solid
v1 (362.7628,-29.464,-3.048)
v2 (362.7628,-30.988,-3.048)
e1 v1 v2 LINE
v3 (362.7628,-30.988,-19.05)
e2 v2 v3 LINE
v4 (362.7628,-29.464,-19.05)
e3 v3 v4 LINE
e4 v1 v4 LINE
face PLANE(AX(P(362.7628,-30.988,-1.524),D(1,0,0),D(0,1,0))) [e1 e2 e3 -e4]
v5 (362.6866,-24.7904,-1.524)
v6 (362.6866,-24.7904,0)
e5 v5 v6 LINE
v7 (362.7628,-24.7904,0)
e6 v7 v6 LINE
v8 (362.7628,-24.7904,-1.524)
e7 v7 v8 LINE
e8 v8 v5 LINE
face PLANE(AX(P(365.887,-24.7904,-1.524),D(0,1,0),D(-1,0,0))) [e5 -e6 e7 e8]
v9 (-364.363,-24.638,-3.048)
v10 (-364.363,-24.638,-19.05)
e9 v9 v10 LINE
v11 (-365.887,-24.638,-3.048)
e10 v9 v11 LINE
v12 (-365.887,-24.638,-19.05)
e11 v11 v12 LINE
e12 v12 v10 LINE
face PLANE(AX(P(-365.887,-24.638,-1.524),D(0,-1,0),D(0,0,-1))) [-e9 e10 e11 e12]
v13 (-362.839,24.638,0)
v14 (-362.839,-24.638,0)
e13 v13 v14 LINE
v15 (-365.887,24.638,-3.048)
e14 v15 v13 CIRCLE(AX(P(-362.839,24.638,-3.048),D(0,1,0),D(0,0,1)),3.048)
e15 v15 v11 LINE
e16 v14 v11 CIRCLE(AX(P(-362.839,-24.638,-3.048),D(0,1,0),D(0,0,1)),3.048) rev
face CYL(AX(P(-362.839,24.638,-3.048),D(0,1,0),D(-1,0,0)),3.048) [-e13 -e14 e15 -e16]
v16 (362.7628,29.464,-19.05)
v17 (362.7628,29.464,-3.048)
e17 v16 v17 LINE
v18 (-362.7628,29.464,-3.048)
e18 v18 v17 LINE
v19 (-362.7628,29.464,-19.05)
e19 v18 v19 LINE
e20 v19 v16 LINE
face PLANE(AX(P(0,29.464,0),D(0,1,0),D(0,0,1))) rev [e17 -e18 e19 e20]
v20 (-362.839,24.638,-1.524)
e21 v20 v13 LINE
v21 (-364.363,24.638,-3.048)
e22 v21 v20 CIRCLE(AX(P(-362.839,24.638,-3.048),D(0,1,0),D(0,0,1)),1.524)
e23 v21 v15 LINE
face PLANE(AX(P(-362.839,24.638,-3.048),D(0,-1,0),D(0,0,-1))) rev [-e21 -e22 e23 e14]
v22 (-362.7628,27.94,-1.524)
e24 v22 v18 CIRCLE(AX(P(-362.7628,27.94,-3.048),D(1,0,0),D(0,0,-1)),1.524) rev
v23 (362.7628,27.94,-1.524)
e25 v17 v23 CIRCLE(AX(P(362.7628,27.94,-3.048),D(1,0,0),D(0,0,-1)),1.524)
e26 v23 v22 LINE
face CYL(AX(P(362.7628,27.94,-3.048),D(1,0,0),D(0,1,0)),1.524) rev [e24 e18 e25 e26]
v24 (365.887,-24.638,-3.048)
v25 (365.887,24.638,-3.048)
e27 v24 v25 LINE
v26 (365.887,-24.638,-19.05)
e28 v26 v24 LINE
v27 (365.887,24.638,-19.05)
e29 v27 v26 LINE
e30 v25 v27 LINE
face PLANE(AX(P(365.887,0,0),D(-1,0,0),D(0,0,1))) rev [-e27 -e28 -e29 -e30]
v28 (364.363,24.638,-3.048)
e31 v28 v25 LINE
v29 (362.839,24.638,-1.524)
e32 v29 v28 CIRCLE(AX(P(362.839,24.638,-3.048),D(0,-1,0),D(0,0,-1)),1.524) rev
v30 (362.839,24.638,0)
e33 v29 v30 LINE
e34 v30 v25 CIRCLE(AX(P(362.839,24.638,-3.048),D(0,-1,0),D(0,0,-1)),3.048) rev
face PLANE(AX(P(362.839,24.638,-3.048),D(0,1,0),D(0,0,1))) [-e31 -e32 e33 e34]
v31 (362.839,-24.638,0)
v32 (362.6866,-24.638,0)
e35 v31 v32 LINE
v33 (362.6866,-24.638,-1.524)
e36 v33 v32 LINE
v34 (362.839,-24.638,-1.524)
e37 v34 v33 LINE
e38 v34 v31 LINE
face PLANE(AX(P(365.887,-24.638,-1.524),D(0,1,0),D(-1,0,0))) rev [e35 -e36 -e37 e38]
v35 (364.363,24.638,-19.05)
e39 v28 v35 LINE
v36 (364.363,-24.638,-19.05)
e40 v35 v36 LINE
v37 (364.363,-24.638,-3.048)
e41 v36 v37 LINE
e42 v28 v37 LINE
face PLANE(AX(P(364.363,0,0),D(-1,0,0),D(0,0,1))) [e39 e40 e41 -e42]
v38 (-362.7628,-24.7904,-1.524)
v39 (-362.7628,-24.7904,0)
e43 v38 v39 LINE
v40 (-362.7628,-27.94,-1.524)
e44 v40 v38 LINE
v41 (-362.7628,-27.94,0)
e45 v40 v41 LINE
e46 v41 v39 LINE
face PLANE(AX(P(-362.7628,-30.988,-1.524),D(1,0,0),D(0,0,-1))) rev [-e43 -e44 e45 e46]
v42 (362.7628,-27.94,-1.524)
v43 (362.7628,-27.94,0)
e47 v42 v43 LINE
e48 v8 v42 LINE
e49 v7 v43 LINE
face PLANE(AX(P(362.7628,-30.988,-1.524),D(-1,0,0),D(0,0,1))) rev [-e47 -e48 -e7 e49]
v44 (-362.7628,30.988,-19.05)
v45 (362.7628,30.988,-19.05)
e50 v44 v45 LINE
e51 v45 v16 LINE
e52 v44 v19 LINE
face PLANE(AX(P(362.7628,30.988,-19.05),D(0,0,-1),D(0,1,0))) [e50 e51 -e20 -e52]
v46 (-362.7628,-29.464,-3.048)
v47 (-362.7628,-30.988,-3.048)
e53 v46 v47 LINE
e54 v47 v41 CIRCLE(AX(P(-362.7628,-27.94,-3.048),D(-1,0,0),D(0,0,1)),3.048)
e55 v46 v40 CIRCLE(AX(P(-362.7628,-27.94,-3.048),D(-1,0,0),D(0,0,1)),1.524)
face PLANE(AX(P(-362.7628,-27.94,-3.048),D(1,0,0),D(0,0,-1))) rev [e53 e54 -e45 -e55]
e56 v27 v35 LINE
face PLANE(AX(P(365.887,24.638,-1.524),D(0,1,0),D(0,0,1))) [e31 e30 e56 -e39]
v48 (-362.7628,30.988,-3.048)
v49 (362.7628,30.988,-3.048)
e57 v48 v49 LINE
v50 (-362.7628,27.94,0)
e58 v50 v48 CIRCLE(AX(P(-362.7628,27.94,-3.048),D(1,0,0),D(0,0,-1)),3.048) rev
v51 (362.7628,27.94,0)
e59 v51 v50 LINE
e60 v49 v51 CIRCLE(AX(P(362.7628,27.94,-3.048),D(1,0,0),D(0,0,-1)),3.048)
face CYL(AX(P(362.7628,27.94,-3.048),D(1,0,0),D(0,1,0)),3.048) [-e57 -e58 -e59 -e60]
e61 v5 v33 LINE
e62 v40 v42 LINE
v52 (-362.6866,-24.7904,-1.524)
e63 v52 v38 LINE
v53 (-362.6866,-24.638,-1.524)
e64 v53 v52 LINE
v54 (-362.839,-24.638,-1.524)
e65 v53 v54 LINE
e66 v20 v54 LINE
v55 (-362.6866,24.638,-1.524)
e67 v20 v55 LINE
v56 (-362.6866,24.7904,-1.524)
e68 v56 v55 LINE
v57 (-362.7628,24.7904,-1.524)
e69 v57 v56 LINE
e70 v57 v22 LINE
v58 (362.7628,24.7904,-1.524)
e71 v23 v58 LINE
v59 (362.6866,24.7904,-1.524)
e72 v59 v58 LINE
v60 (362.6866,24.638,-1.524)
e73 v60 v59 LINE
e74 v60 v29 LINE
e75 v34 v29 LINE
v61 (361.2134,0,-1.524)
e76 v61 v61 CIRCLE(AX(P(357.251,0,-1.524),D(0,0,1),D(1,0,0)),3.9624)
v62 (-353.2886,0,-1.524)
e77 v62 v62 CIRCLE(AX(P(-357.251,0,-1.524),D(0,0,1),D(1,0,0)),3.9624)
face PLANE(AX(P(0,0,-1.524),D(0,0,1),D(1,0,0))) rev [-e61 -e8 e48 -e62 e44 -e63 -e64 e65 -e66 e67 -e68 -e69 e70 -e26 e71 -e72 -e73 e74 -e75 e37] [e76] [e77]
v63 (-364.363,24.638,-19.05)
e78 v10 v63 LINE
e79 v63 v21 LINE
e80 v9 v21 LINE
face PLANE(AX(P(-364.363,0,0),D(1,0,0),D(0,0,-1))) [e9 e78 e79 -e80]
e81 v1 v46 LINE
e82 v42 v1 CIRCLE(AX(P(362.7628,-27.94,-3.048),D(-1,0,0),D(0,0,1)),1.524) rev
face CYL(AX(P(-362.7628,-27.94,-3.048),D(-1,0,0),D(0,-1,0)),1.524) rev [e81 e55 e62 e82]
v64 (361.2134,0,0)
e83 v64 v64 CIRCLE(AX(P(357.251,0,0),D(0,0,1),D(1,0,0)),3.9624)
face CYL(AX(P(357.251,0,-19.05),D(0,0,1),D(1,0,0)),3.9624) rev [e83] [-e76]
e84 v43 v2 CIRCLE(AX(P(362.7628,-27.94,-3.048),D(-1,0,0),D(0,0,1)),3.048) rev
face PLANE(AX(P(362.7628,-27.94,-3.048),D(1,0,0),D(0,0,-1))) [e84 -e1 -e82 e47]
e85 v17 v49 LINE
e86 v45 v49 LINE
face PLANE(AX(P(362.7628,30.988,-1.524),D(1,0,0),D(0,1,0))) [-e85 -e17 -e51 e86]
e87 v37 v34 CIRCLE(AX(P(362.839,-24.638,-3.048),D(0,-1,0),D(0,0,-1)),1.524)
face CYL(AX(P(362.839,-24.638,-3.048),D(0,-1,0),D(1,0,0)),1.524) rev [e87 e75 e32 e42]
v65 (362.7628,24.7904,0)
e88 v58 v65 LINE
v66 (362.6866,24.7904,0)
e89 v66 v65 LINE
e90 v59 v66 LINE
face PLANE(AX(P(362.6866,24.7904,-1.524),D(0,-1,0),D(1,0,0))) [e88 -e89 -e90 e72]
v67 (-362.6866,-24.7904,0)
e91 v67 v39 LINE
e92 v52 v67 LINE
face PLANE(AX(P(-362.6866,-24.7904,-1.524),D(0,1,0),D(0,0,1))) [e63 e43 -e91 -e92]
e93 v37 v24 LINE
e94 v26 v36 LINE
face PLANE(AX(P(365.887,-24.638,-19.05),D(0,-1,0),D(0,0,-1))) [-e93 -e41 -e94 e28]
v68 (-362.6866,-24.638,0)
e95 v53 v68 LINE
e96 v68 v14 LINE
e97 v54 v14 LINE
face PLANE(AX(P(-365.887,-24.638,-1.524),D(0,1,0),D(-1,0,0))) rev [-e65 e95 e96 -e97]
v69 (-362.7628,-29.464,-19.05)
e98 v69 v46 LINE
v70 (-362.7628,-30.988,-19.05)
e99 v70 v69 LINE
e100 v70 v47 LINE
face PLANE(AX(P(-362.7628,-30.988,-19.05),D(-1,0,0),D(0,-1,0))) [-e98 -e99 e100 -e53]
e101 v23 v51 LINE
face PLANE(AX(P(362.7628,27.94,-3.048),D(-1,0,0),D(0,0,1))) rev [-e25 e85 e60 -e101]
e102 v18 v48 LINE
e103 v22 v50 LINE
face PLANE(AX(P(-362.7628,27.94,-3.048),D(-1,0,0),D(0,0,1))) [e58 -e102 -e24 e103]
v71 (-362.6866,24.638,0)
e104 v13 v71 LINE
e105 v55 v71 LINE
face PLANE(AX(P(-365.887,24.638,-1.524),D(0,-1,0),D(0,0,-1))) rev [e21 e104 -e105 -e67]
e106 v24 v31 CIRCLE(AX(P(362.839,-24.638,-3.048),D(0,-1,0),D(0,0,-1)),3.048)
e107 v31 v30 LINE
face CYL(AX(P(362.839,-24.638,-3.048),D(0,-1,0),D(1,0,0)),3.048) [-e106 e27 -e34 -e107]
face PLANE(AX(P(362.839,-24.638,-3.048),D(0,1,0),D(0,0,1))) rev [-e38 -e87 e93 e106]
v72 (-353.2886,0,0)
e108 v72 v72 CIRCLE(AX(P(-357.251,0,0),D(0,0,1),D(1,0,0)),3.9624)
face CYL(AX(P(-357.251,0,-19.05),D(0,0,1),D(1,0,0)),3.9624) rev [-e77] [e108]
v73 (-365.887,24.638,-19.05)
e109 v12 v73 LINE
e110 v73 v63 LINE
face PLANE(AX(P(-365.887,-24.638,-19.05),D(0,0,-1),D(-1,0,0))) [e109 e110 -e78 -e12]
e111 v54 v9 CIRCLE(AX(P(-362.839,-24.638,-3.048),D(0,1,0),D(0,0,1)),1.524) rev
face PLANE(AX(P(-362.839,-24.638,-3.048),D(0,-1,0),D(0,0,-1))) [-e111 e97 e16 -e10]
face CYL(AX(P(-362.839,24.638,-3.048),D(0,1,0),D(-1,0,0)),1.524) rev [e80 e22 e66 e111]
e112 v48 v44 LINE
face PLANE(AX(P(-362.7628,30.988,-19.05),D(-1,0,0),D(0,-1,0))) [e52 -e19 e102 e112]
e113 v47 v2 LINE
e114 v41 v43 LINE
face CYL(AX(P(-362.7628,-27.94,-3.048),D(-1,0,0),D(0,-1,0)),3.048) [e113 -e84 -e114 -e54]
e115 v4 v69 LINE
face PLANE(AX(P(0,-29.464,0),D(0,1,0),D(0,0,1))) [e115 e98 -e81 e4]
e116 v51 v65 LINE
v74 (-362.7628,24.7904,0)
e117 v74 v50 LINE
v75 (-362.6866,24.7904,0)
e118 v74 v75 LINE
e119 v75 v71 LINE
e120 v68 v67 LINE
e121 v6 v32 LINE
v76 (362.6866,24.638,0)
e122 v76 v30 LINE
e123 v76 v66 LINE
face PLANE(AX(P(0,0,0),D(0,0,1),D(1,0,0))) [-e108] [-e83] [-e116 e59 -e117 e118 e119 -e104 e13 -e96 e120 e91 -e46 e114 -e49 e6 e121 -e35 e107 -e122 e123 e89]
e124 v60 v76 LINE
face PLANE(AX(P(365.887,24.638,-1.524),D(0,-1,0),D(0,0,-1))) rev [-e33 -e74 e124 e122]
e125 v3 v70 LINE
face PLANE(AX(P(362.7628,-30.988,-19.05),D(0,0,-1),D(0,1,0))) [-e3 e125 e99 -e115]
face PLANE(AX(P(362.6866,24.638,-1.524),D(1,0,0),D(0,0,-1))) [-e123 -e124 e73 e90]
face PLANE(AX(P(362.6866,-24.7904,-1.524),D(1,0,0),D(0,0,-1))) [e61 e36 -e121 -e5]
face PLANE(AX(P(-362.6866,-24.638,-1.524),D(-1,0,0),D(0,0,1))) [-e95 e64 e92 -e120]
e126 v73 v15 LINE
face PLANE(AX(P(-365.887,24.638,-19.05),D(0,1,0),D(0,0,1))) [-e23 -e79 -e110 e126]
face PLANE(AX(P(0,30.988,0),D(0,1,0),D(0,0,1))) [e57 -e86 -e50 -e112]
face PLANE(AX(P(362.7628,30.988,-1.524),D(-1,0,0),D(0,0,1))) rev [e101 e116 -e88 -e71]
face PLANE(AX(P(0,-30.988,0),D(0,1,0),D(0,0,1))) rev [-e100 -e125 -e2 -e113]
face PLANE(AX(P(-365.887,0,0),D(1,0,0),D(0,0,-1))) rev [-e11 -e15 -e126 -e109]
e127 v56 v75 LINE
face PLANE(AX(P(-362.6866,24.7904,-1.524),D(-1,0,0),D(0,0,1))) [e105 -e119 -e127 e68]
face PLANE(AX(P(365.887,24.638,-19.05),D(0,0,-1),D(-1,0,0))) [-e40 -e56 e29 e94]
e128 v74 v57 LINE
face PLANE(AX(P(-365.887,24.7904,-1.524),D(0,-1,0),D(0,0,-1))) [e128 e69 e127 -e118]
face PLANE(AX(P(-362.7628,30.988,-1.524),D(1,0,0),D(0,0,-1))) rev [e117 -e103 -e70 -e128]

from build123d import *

# Parameters (mm, degrees)
CROQUIS1_W                   = 731.774
CROQUIS1_H                   = 61.976
BRIDA_BASE1_DEPTH            = 1.524
CROQUIS6_W                   = 3.1242
CROQUIS6_H                   = 6.35
CORTAR_EXTRUIR1_DEPTH        = 368.200048324
BRIDA_START                  = -362.7628
BRIDA_DE_ARISTA1_DEPTH       = 725.5256
BRIDA_START_2                = 6.35
BRIDA_DE_ARISTA1_2_DEPTH     = 49.276
BRIDA_DE_ARISTA1_3_DEPTH     = 725.5256
BRIDA_DE_ARISTA1_4_OUTLINE_W = 0.1524
BRIDA_DE_ARISTA1_4_OUTLINE_H = 1.524
BRIDA_DE_ARISTA1_4_DEPTH     = 0.0762
BRIDA_START_3                = 362.6866
BRIDA_DE_ARISTA1_5_OUTLINE_W = 0.1524
BRIDA_DE_ARISTA1_5_OUTLINE_H = 1.524
BRIDA_DE_ARISTA1_5_DEPTH     = 0.0762
BRIDA_DE_ARISTA1_6_DEPTH     = 49.276
CROQUIS19_R                  = 3.9624
CORTAR_EXTRUIR2_DEPTH        = 368.690706183


# Read off the part's stored shape, not the designer's step: Brida de arista1
# Sheet-metal steps are written as plain solids
with BuildPart() as part:
    # Croquis1 → Brida base1 (new body)
    with BuildSketch(Plane.XY):
        Rectangle(CROQUIS1_W, CROQUIS1_H)
    extrude(amount=-BRIDA_BASE1_DEPTH)

    # Croquis6 → Cortar-Extruir1 (cut, through all)
    with BuildSketch(Plane.XY):
        with Locations((364.3249, 27.813)):
            Rectangle(CROQUIS6_W, CROQUIS6_H)
        with Locations((364.3249, -27.813)):
            Rectangle(CROQUIS6_W, CROQUIS6_H)
        with Locations((-364.3249, -27.813)):
            Rectangle(CROQUIS6_W, CROQUIS6_H)
        with Locations((-364.3249, 27.813)):
            Rectangle(CROQUIS6_W, CROQUIS6_H)
    extrude(amount=-CORTAR_EXTRUIR1_DEPTH, mode=Mode.SUBTRACT)

    # Brida de arista1 outline → Brida de arista1 (add)
    with BuildSketch(Plane.YZ.offset(BRIDA_START)):
        with BuildLine():
            Line((30.988, -19.05), (30.988, -3.048))
            ThreePointArc((30.988, -3.048), (30.884141918, -2.259119551), (30.579645431, -1.524))
            Line((30.579645431, -1.524), (27.94, -1.524))
            ThreePointArc((27.94, -1.524), (29.017630735, -1.970369265), (29.464, -3.048))
            Line((29.464, -3.048), (29.464, -19.05))
            Line((29.464, -19.05), (30.988, -19.05))
        make_face()
        with BuildLine():
            ThreePointArc((-29.464, -3.048), (-29.017630735, -1.970369265), (-27.94, -1.524))
            Line((-27.94, -1.524), (-30.579645431, -1.524))
            ThreePointArc((-30.579645431, -1.524), (-30.884141918, -2.259119551), (-30.988, -3.048))
            Line((-30.988, -3.048), (-30.988, -19.05))
            Line((-30.988, -19.05), (-29.464, -19.05))
            Line((-29.464, -19.05), (-29.464, -3.048))
        make_face()
    extrude(amount=BRIDA_DE_ARISTA1_DEPTH)

    # Brida de arista1 2 outline → Brida de arista1 2 (add)
    with BuildSketch(Plane(origin=(0, 30.988, -1.524), x_dir=(-1, 0, 0), z_dir=(0, -1, 0)).offset(BRIDA_START_2)):
        with BuildLine():
            Line((-364.363, 1.524), (-364.363, 17.526))
            Line((-364.363, 17.526), (-365.887, 17.526))
            Line((-365.887, 17.526), (-365.887, 1.524))
            ThreePointArc((-365.887, 1.524), (-365.783141918, 0.735119551), (-365.478645431, 0))
            Line((-365.478645431, 0), (-362.839, 0))
            ThreePointArc((-362.839, 0), (-363.916630735, 0.446369265), (-364.363, 1.524))
        make_face()
        with BuildLine():
            ThreePointArc((364.363, 1.524), (363.916630735, 0.446369265), (362.839, 0))
            Line((362.839, 0), (365.478645431, 0))
            ThreePointArc((365.478645431, 0), (365.783141918, 0.735119551), (365.887, 1.524))
            Line((365.887, 1.524), (365.887, 17.526))
            Line((365.887, 17.526), (364.363, 17.526))
            Line((364.363, 17.526), (364.363, 1.524))
        make_face()
    extrude(amount=BRIDA_DE_ARISTA1_2_DEPTH)

    # Brida de arista1 3 outline → Brida de arista1 3 (cut)
    with BuildSketch(Plane.YZ.offset(BRIDA_START)):
        with BuildLine():
            ThreePointArc((27.94, 0), (29.464, -0.408354569), (30.579645431, -1.524))
            Line((30.579645431, -1.524), (30.988, -1.524))
            Line((30.988, -1.524), (30.988, 0))
            Line((30.988, 0), (27.94, 0))
        make_face()
        with BuildLine():
            ThreePointArc((-30.579645431, -1.524), (-29.464, -0.408354569), (-27.94, 0))
            Line((-27.94, 0), (-30.988, 0))
            Line((-30.988, 0), (-30.988, -1.524))
            Line((-30.988, -1.524), (-30.579645431, -1.524))
        make_face()
    extrude(amount=BRIDA_DE_ARISTA1_3_DEPTH, mode=Mode.SUBTRACT)

    # Brida de arista1 4 outline → Brida de arista1 4 (cut)
    with BuildSketch(Plane.YZ.offset(BRIDA_START)):
        with Locations((24.7142, -0.762)):
            Rectangle(BRIDA_DE_ARISTA1_4_OUTLINE_W, BRIDA_DE_ARISTA1_4_OUTLINE_H)
        with Locations((-24.7142, -0.762)):
            Rectangle(BRIDA_DE_ARISTA1_4_OUTLINE_W, BRIDA_DE_ARISTA1_4_OUTLINE_H)
    extrude(amount=BRIDA_DE_ARISTA1_4_DEPTH, mode=Mode.SUBTRACT)

    # Brida de arista1 5 outline → Brida de arista1 5 (cut)
    with BuildSketch(Plane.YZ.offset(BRIDA_START_3)):
        with Locations((24.7142, -0.762)):
            Rectangle(BRIDA_DE_ARISTA1_5_OUTLINE_W, BRIDA_DE_ARISTA1_5_OUTLINE_H)
        with Locations((-24.7142, -0.762)):
            Rectangle(BRIDA_DE_ARISTA1_5_OUTLINE_W, BRIDA_DE_ARISTA1_5_OUTLINE_H)
    extrude(amount=BRIDA_DE_ARISTA1_5_DEPTH, mode=Mode.SUBTRACT)

    # Brida de arista1 6 outline → Brida de arista1 6 (cut)
    with BuildSketch(Plane(origin=(0, 30.988, -1.524), x_dir=(-1, 0, 0), z_dir=(0, -1, 0)).offset(BRIDA_START_2)):
        with BuildLine():
            ThreePointArc((-362.839, -1.524), (-364.363, -1.115645431), (-365.478645431, 0))
            Line((-365.478645431, 0), (-365.887, 0))
            Line((-365.887, 0), (-365.887, -1.524))
            Line((-365.887, -1.524), (-362.839, -1.524))
        make_face()
        with BuildLine():
            Line((365.887, 0), (365.478645431, 0))
            ThreePointArc((365.478645431, 0), (364.363, -1.115645431), (362.839, -1.524))
            Line((362.839, -1.524), (365.887, -1.524))
            Line((365.887, -1.524), (365.887, 0))
        make_face()
    extrude(amount=BRIDA_DE_ARISTA1_6_DEPTH, mode=Mode.SUBTRACT)

    # Croquis19 → Cortar-Extruir2 (cut, through all)
    with BuildSketch(Plane.XY):
        with Locations((-357.251, 0)):
            Circle(CROQUIS19_R)
        with Locations((357.251, 0)):
            Circle(CROQUIS19_R)
    extrude(amount=-CORTAR_EXTRUIR2_DEPTH, mode=Mode.SUBTRACT)


solid = part.part
